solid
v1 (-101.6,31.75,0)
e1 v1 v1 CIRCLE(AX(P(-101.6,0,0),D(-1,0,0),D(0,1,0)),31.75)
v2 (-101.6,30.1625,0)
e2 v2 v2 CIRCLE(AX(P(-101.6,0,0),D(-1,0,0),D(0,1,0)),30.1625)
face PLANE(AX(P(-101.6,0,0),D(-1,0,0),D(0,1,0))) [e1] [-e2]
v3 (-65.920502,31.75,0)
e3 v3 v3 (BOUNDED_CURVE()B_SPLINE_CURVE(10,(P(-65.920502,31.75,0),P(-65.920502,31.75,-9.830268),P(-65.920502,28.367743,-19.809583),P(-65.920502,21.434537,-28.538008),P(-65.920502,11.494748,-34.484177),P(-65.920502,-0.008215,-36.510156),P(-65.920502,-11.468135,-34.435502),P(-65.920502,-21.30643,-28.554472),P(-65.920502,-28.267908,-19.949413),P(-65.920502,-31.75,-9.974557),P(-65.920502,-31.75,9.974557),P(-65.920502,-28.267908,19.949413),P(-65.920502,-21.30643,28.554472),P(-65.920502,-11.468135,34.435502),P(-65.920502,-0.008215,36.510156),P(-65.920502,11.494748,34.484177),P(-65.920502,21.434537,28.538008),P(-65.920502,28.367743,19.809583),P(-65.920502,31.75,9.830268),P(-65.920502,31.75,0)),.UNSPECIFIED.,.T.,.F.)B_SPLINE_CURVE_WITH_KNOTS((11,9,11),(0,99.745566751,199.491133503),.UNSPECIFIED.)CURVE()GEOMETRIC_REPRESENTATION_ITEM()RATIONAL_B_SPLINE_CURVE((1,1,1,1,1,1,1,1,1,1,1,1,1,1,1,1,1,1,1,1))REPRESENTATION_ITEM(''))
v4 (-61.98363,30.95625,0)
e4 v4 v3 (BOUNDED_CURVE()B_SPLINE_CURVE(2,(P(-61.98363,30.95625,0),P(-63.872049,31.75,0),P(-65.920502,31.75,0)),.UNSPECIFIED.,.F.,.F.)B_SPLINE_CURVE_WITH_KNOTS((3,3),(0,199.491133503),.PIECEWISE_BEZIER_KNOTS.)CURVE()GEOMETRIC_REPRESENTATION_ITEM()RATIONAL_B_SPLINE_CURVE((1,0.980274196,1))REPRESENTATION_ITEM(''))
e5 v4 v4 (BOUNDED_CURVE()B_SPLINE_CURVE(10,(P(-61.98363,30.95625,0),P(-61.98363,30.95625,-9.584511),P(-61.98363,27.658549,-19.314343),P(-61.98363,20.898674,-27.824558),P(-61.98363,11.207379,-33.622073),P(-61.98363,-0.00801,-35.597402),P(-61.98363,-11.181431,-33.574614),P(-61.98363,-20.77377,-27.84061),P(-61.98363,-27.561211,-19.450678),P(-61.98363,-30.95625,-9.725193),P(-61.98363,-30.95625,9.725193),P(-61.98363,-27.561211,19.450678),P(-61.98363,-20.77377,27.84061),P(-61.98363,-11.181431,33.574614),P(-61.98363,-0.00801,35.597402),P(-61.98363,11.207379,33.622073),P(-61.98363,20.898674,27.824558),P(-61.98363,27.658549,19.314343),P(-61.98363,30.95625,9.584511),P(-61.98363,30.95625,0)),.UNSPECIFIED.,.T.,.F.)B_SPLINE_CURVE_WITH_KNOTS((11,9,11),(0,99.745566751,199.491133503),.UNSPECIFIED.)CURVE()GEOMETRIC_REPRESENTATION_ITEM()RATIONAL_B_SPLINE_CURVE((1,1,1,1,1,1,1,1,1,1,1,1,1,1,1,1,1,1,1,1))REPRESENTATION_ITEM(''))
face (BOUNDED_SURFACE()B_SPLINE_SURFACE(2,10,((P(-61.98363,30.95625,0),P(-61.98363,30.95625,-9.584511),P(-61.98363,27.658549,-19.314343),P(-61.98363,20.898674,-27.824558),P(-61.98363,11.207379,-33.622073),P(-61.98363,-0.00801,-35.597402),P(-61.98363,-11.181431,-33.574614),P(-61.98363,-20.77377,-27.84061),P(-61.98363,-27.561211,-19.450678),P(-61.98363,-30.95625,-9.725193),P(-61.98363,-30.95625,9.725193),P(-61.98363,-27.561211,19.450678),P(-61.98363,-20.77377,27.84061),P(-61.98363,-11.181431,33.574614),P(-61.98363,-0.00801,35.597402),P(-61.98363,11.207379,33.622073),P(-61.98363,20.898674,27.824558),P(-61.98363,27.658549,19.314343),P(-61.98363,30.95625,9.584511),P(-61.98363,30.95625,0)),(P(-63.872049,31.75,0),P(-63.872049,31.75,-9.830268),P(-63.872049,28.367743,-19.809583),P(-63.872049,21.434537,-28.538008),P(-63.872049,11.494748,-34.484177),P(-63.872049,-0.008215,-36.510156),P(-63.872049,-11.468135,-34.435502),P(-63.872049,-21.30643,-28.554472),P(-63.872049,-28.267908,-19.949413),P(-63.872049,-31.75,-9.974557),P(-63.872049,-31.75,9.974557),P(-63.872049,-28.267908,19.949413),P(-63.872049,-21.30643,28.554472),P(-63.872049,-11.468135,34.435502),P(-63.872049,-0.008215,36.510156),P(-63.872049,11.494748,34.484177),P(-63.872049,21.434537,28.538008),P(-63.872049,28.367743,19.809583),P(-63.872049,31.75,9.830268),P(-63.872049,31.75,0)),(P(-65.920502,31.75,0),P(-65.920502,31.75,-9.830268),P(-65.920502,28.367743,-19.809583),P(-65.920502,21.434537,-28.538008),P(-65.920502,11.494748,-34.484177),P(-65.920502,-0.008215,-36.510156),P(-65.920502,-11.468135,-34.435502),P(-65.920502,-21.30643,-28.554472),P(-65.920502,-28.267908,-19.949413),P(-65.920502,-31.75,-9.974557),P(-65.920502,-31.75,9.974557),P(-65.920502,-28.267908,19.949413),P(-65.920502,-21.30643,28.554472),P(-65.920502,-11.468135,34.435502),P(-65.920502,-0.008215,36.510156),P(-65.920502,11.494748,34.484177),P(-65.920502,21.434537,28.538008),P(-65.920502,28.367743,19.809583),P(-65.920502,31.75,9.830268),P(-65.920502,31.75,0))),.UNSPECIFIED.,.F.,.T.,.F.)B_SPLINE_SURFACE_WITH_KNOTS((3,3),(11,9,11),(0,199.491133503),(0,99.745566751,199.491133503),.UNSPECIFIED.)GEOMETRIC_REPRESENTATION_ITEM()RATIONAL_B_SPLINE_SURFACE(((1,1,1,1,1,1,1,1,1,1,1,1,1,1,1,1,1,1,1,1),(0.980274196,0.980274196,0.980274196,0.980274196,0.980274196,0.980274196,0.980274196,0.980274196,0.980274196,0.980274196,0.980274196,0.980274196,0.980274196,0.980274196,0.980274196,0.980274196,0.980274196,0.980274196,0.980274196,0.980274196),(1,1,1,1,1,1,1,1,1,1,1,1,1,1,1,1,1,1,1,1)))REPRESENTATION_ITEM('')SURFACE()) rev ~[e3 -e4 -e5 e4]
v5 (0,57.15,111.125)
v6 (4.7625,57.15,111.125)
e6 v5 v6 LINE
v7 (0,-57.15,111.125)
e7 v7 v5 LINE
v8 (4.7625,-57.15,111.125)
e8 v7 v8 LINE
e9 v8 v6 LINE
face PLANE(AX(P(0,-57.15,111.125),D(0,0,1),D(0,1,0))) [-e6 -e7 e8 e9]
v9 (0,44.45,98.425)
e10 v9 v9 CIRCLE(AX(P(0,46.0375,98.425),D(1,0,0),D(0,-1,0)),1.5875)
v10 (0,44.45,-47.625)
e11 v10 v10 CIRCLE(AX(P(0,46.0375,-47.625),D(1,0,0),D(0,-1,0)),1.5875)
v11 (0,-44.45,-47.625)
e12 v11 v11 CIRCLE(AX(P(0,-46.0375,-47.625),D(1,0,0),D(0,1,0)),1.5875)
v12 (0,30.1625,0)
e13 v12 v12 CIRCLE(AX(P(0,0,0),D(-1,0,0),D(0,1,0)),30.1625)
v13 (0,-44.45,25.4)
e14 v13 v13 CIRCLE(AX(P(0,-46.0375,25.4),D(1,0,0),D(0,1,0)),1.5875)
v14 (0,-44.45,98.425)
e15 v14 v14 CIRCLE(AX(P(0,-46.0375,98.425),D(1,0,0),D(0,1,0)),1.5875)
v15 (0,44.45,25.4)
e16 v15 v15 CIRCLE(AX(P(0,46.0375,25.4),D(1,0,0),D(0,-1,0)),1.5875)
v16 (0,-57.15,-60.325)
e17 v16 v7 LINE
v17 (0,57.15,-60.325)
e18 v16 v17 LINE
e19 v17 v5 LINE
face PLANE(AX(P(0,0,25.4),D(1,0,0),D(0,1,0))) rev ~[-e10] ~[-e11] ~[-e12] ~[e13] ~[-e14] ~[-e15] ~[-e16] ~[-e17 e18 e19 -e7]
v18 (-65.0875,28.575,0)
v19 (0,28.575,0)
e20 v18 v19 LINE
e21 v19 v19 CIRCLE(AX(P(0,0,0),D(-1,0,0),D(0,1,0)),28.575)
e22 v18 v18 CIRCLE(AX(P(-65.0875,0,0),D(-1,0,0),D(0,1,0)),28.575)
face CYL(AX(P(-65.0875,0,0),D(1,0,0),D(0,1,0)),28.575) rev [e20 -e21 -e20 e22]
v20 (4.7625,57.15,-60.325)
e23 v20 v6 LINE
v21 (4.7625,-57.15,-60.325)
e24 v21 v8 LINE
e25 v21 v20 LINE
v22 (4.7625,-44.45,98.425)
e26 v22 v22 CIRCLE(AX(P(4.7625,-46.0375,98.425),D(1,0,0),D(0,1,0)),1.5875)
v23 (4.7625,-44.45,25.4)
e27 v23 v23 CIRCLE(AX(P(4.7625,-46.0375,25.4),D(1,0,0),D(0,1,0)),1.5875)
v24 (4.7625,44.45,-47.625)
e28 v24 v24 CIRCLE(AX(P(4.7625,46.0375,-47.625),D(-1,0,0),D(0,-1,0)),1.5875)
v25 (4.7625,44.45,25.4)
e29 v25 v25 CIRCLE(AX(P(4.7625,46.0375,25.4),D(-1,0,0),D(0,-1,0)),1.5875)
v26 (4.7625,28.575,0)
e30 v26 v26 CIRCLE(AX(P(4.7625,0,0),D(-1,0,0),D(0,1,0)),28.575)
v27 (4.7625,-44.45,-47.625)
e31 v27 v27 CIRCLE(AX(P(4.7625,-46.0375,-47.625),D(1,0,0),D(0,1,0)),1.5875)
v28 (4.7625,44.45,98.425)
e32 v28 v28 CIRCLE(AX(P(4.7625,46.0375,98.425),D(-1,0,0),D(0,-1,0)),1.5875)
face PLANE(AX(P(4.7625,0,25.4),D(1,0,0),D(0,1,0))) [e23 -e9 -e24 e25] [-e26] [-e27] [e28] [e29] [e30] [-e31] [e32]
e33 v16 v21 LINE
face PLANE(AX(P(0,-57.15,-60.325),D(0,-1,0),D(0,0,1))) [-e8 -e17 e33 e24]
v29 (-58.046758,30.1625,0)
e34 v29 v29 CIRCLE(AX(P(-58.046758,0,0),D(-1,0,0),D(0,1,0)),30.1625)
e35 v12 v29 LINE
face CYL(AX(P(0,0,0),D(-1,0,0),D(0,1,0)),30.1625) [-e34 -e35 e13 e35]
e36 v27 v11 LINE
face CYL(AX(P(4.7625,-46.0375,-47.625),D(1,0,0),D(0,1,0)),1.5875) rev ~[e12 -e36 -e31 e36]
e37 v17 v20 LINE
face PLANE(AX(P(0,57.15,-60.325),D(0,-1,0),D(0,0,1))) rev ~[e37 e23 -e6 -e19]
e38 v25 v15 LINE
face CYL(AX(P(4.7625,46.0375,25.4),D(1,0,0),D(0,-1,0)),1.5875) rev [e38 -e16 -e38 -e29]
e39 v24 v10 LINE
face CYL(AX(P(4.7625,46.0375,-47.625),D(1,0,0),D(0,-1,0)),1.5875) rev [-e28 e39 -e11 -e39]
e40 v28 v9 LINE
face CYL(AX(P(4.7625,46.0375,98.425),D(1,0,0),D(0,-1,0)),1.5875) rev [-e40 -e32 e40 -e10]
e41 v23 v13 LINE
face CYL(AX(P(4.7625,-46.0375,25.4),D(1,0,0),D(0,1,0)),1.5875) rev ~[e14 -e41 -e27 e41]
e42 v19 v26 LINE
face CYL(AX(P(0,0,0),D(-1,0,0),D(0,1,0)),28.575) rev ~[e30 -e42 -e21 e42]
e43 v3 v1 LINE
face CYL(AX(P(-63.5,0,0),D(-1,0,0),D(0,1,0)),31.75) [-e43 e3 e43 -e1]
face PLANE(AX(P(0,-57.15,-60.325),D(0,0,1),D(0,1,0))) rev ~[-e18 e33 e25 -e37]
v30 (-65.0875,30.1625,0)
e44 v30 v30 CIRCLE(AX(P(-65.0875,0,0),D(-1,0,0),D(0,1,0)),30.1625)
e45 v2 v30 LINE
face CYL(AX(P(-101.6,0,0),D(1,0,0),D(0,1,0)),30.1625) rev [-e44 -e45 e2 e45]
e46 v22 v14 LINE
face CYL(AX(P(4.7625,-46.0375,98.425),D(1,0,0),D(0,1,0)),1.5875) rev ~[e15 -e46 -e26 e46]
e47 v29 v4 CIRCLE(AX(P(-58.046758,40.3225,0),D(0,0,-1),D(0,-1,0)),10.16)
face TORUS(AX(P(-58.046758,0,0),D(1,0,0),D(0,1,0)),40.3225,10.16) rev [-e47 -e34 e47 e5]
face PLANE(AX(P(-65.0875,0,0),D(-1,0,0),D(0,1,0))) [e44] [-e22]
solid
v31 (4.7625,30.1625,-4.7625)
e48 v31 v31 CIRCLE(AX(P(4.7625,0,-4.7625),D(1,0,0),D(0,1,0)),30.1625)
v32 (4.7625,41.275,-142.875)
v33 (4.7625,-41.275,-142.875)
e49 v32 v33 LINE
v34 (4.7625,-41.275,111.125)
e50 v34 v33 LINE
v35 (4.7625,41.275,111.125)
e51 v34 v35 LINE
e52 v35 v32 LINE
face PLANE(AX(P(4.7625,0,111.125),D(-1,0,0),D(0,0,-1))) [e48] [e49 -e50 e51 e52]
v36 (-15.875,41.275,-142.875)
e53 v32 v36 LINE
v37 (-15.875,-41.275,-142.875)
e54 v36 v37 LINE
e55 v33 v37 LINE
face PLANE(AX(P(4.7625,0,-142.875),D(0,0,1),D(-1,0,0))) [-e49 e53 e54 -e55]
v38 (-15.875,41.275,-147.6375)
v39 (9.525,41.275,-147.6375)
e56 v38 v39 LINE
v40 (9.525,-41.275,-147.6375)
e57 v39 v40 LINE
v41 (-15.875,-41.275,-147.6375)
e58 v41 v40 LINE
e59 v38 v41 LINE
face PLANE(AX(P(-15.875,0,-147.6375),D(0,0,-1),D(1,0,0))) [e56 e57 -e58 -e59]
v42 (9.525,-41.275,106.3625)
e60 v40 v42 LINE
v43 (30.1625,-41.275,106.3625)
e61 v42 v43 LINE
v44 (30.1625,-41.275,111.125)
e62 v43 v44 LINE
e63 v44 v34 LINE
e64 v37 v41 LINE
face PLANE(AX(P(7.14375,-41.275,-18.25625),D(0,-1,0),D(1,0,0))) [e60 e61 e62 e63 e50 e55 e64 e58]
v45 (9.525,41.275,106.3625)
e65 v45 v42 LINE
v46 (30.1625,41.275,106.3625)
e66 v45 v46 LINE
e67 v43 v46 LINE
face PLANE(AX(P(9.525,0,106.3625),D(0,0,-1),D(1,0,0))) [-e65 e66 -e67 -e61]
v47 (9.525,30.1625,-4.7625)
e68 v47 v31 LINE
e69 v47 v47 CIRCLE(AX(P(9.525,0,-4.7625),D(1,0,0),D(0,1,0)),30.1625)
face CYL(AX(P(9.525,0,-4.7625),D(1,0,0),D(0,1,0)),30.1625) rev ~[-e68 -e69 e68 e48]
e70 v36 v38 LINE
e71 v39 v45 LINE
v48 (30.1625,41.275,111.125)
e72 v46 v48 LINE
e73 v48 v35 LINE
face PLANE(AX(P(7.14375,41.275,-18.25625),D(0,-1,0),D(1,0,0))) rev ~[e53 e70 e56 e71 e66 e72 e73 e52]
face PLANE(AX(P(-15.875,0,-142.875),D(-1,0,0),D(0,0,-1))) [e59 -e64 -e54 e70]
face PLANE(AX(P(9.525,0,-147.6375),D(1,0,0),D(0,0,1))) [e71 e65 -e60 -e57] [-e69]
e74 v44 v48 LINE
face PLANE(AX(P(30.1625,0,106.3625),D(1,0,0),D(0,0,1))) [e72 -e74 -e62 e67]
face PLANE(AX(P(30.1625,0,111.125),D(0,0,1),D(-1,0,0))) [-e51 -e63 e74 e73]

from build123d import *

# Parameters (mm, degrees)
F4_R      = 10.16
F5_W      = 114.3
F5_H      = 171.45
F6_DEPTH  = 4.7625
F7_DEPTH  = 4.7635
F8_R      = 1.5875
F9_DEPTH  = 106.3635001
F11_DEPTH = 41.275
F12_R     = 30.1625
F13_DEPTH = 111.1260001


# Not quite as in the source:
# - a fillet or chamfer that OpenCascade refuses, or shapes differently, is made with other operations: its cross-section is extruded or revolved along the edge and cut away or added
# - a pattern or mirror of a feature is missing from the dataset's text; its kind, count and spacing are read off the source's solid


with BuildPart() as f2:
    # F0 (on Top) → F2 (revolve)
    with BuildSketch(Plane.XY):
        Polygon((-65.0875, 28.575), (0, 28.575), (0, 30.1625), (-63.5, 30.1625), (-63.5, 31.75), (-101.6, 31.75), (-101.6, 30.1625), (-65.0875, 30.1625), align=None)
    revolve(axis=Axis((-31.0941394418, 0, 0), (-1, 0, 0)))

    # F3: fillet of radius 10.16 on 1 edges, made by hand

    # F3_s1 → F3_t2 (revolve)
    with BuildSketch(Plane.XY):
        with BuildLine():
            ThreePointArc((-58.0467584182, 30.1625), (-60.8865647496, 30.5674449002), (-63.5, 31.75))
            Line((-63.5, 31.75), (-63.5, 30.1625))
            Line((-63.5, 30.1625), (-58.0467584182, 30.1625))
        make_face()
    revolve(axis=Axis((-63.5, 0, 0), (-1, 0, 0)))

    # F4
    f4_edges = [f2.edges().sort_by_distance(p)[0] for p in [
        (-63.5, -31.75, 0),
    ]]
    fillet(f4_edges, radius=F4_R)

    # F5 (on Right) → F6 (join)
    with BuildSketch(Plane.YZ):
        with Locations((0, 25.4)):
            Rectangle(F5_W, F5_H)
    extrude(amount=F6_DEPTH)

    # F7 (cut, through all): a face of the model
    f7_faces = [f2.faces().sort_by_distance(p)[0] for p in [
        (0, 0, 0),
    ]]
    extrude(f7_faces, amount=-F7_DEPTH, mode=Mode.SUBTRACT)

    # F8 (on face) → F9 (cut, through all)
    with BuildSketch(Plane.YZ.offset(4.7625)):
        with Locations((-46.0375, -47.625)):
            Circle(F8_R)
        with Locations((-46.0375, 25.4)):
            Circle(F8_R)
        with Locations((-46.0375, 98.425)):
            Circle(F8_R)
    f9 = extrude(amount=-F9_DEPTH, mode=Mode.SUBTRACT)

    # F9_copies: F9 across plane
    add(f9.mirror(Plane.ZX), mode=Mode.SUBTRACT)


with BuildPart() as f11:
    # F10 (on Front) → F11 (new body, symmetric)
    with BuildSketch(Plane.XZ):
        Polygon((4.7625, 111.125), (4.7625, -142.875), (-15.875, -142.875), (-15.875, -147.6375), (9.525, -147.6375), (9.525, 106.3625), (30.1625, 106.3625), (30.1625, 111.125), align=None)
    extrude(amount=F11_DEPTH, both=True)

    # F12 (on face) → F13 (cut, through all)
    with BuildSketch(Plane.YZ.offset(9.525)):
        with Locations((0, -4.7625)):
            Circle(F12_R)
    extrude(amount=-F13_DEPTH, mode=Mode.SUBTRACT)


solid = Compound([f2.part, f11.part])
